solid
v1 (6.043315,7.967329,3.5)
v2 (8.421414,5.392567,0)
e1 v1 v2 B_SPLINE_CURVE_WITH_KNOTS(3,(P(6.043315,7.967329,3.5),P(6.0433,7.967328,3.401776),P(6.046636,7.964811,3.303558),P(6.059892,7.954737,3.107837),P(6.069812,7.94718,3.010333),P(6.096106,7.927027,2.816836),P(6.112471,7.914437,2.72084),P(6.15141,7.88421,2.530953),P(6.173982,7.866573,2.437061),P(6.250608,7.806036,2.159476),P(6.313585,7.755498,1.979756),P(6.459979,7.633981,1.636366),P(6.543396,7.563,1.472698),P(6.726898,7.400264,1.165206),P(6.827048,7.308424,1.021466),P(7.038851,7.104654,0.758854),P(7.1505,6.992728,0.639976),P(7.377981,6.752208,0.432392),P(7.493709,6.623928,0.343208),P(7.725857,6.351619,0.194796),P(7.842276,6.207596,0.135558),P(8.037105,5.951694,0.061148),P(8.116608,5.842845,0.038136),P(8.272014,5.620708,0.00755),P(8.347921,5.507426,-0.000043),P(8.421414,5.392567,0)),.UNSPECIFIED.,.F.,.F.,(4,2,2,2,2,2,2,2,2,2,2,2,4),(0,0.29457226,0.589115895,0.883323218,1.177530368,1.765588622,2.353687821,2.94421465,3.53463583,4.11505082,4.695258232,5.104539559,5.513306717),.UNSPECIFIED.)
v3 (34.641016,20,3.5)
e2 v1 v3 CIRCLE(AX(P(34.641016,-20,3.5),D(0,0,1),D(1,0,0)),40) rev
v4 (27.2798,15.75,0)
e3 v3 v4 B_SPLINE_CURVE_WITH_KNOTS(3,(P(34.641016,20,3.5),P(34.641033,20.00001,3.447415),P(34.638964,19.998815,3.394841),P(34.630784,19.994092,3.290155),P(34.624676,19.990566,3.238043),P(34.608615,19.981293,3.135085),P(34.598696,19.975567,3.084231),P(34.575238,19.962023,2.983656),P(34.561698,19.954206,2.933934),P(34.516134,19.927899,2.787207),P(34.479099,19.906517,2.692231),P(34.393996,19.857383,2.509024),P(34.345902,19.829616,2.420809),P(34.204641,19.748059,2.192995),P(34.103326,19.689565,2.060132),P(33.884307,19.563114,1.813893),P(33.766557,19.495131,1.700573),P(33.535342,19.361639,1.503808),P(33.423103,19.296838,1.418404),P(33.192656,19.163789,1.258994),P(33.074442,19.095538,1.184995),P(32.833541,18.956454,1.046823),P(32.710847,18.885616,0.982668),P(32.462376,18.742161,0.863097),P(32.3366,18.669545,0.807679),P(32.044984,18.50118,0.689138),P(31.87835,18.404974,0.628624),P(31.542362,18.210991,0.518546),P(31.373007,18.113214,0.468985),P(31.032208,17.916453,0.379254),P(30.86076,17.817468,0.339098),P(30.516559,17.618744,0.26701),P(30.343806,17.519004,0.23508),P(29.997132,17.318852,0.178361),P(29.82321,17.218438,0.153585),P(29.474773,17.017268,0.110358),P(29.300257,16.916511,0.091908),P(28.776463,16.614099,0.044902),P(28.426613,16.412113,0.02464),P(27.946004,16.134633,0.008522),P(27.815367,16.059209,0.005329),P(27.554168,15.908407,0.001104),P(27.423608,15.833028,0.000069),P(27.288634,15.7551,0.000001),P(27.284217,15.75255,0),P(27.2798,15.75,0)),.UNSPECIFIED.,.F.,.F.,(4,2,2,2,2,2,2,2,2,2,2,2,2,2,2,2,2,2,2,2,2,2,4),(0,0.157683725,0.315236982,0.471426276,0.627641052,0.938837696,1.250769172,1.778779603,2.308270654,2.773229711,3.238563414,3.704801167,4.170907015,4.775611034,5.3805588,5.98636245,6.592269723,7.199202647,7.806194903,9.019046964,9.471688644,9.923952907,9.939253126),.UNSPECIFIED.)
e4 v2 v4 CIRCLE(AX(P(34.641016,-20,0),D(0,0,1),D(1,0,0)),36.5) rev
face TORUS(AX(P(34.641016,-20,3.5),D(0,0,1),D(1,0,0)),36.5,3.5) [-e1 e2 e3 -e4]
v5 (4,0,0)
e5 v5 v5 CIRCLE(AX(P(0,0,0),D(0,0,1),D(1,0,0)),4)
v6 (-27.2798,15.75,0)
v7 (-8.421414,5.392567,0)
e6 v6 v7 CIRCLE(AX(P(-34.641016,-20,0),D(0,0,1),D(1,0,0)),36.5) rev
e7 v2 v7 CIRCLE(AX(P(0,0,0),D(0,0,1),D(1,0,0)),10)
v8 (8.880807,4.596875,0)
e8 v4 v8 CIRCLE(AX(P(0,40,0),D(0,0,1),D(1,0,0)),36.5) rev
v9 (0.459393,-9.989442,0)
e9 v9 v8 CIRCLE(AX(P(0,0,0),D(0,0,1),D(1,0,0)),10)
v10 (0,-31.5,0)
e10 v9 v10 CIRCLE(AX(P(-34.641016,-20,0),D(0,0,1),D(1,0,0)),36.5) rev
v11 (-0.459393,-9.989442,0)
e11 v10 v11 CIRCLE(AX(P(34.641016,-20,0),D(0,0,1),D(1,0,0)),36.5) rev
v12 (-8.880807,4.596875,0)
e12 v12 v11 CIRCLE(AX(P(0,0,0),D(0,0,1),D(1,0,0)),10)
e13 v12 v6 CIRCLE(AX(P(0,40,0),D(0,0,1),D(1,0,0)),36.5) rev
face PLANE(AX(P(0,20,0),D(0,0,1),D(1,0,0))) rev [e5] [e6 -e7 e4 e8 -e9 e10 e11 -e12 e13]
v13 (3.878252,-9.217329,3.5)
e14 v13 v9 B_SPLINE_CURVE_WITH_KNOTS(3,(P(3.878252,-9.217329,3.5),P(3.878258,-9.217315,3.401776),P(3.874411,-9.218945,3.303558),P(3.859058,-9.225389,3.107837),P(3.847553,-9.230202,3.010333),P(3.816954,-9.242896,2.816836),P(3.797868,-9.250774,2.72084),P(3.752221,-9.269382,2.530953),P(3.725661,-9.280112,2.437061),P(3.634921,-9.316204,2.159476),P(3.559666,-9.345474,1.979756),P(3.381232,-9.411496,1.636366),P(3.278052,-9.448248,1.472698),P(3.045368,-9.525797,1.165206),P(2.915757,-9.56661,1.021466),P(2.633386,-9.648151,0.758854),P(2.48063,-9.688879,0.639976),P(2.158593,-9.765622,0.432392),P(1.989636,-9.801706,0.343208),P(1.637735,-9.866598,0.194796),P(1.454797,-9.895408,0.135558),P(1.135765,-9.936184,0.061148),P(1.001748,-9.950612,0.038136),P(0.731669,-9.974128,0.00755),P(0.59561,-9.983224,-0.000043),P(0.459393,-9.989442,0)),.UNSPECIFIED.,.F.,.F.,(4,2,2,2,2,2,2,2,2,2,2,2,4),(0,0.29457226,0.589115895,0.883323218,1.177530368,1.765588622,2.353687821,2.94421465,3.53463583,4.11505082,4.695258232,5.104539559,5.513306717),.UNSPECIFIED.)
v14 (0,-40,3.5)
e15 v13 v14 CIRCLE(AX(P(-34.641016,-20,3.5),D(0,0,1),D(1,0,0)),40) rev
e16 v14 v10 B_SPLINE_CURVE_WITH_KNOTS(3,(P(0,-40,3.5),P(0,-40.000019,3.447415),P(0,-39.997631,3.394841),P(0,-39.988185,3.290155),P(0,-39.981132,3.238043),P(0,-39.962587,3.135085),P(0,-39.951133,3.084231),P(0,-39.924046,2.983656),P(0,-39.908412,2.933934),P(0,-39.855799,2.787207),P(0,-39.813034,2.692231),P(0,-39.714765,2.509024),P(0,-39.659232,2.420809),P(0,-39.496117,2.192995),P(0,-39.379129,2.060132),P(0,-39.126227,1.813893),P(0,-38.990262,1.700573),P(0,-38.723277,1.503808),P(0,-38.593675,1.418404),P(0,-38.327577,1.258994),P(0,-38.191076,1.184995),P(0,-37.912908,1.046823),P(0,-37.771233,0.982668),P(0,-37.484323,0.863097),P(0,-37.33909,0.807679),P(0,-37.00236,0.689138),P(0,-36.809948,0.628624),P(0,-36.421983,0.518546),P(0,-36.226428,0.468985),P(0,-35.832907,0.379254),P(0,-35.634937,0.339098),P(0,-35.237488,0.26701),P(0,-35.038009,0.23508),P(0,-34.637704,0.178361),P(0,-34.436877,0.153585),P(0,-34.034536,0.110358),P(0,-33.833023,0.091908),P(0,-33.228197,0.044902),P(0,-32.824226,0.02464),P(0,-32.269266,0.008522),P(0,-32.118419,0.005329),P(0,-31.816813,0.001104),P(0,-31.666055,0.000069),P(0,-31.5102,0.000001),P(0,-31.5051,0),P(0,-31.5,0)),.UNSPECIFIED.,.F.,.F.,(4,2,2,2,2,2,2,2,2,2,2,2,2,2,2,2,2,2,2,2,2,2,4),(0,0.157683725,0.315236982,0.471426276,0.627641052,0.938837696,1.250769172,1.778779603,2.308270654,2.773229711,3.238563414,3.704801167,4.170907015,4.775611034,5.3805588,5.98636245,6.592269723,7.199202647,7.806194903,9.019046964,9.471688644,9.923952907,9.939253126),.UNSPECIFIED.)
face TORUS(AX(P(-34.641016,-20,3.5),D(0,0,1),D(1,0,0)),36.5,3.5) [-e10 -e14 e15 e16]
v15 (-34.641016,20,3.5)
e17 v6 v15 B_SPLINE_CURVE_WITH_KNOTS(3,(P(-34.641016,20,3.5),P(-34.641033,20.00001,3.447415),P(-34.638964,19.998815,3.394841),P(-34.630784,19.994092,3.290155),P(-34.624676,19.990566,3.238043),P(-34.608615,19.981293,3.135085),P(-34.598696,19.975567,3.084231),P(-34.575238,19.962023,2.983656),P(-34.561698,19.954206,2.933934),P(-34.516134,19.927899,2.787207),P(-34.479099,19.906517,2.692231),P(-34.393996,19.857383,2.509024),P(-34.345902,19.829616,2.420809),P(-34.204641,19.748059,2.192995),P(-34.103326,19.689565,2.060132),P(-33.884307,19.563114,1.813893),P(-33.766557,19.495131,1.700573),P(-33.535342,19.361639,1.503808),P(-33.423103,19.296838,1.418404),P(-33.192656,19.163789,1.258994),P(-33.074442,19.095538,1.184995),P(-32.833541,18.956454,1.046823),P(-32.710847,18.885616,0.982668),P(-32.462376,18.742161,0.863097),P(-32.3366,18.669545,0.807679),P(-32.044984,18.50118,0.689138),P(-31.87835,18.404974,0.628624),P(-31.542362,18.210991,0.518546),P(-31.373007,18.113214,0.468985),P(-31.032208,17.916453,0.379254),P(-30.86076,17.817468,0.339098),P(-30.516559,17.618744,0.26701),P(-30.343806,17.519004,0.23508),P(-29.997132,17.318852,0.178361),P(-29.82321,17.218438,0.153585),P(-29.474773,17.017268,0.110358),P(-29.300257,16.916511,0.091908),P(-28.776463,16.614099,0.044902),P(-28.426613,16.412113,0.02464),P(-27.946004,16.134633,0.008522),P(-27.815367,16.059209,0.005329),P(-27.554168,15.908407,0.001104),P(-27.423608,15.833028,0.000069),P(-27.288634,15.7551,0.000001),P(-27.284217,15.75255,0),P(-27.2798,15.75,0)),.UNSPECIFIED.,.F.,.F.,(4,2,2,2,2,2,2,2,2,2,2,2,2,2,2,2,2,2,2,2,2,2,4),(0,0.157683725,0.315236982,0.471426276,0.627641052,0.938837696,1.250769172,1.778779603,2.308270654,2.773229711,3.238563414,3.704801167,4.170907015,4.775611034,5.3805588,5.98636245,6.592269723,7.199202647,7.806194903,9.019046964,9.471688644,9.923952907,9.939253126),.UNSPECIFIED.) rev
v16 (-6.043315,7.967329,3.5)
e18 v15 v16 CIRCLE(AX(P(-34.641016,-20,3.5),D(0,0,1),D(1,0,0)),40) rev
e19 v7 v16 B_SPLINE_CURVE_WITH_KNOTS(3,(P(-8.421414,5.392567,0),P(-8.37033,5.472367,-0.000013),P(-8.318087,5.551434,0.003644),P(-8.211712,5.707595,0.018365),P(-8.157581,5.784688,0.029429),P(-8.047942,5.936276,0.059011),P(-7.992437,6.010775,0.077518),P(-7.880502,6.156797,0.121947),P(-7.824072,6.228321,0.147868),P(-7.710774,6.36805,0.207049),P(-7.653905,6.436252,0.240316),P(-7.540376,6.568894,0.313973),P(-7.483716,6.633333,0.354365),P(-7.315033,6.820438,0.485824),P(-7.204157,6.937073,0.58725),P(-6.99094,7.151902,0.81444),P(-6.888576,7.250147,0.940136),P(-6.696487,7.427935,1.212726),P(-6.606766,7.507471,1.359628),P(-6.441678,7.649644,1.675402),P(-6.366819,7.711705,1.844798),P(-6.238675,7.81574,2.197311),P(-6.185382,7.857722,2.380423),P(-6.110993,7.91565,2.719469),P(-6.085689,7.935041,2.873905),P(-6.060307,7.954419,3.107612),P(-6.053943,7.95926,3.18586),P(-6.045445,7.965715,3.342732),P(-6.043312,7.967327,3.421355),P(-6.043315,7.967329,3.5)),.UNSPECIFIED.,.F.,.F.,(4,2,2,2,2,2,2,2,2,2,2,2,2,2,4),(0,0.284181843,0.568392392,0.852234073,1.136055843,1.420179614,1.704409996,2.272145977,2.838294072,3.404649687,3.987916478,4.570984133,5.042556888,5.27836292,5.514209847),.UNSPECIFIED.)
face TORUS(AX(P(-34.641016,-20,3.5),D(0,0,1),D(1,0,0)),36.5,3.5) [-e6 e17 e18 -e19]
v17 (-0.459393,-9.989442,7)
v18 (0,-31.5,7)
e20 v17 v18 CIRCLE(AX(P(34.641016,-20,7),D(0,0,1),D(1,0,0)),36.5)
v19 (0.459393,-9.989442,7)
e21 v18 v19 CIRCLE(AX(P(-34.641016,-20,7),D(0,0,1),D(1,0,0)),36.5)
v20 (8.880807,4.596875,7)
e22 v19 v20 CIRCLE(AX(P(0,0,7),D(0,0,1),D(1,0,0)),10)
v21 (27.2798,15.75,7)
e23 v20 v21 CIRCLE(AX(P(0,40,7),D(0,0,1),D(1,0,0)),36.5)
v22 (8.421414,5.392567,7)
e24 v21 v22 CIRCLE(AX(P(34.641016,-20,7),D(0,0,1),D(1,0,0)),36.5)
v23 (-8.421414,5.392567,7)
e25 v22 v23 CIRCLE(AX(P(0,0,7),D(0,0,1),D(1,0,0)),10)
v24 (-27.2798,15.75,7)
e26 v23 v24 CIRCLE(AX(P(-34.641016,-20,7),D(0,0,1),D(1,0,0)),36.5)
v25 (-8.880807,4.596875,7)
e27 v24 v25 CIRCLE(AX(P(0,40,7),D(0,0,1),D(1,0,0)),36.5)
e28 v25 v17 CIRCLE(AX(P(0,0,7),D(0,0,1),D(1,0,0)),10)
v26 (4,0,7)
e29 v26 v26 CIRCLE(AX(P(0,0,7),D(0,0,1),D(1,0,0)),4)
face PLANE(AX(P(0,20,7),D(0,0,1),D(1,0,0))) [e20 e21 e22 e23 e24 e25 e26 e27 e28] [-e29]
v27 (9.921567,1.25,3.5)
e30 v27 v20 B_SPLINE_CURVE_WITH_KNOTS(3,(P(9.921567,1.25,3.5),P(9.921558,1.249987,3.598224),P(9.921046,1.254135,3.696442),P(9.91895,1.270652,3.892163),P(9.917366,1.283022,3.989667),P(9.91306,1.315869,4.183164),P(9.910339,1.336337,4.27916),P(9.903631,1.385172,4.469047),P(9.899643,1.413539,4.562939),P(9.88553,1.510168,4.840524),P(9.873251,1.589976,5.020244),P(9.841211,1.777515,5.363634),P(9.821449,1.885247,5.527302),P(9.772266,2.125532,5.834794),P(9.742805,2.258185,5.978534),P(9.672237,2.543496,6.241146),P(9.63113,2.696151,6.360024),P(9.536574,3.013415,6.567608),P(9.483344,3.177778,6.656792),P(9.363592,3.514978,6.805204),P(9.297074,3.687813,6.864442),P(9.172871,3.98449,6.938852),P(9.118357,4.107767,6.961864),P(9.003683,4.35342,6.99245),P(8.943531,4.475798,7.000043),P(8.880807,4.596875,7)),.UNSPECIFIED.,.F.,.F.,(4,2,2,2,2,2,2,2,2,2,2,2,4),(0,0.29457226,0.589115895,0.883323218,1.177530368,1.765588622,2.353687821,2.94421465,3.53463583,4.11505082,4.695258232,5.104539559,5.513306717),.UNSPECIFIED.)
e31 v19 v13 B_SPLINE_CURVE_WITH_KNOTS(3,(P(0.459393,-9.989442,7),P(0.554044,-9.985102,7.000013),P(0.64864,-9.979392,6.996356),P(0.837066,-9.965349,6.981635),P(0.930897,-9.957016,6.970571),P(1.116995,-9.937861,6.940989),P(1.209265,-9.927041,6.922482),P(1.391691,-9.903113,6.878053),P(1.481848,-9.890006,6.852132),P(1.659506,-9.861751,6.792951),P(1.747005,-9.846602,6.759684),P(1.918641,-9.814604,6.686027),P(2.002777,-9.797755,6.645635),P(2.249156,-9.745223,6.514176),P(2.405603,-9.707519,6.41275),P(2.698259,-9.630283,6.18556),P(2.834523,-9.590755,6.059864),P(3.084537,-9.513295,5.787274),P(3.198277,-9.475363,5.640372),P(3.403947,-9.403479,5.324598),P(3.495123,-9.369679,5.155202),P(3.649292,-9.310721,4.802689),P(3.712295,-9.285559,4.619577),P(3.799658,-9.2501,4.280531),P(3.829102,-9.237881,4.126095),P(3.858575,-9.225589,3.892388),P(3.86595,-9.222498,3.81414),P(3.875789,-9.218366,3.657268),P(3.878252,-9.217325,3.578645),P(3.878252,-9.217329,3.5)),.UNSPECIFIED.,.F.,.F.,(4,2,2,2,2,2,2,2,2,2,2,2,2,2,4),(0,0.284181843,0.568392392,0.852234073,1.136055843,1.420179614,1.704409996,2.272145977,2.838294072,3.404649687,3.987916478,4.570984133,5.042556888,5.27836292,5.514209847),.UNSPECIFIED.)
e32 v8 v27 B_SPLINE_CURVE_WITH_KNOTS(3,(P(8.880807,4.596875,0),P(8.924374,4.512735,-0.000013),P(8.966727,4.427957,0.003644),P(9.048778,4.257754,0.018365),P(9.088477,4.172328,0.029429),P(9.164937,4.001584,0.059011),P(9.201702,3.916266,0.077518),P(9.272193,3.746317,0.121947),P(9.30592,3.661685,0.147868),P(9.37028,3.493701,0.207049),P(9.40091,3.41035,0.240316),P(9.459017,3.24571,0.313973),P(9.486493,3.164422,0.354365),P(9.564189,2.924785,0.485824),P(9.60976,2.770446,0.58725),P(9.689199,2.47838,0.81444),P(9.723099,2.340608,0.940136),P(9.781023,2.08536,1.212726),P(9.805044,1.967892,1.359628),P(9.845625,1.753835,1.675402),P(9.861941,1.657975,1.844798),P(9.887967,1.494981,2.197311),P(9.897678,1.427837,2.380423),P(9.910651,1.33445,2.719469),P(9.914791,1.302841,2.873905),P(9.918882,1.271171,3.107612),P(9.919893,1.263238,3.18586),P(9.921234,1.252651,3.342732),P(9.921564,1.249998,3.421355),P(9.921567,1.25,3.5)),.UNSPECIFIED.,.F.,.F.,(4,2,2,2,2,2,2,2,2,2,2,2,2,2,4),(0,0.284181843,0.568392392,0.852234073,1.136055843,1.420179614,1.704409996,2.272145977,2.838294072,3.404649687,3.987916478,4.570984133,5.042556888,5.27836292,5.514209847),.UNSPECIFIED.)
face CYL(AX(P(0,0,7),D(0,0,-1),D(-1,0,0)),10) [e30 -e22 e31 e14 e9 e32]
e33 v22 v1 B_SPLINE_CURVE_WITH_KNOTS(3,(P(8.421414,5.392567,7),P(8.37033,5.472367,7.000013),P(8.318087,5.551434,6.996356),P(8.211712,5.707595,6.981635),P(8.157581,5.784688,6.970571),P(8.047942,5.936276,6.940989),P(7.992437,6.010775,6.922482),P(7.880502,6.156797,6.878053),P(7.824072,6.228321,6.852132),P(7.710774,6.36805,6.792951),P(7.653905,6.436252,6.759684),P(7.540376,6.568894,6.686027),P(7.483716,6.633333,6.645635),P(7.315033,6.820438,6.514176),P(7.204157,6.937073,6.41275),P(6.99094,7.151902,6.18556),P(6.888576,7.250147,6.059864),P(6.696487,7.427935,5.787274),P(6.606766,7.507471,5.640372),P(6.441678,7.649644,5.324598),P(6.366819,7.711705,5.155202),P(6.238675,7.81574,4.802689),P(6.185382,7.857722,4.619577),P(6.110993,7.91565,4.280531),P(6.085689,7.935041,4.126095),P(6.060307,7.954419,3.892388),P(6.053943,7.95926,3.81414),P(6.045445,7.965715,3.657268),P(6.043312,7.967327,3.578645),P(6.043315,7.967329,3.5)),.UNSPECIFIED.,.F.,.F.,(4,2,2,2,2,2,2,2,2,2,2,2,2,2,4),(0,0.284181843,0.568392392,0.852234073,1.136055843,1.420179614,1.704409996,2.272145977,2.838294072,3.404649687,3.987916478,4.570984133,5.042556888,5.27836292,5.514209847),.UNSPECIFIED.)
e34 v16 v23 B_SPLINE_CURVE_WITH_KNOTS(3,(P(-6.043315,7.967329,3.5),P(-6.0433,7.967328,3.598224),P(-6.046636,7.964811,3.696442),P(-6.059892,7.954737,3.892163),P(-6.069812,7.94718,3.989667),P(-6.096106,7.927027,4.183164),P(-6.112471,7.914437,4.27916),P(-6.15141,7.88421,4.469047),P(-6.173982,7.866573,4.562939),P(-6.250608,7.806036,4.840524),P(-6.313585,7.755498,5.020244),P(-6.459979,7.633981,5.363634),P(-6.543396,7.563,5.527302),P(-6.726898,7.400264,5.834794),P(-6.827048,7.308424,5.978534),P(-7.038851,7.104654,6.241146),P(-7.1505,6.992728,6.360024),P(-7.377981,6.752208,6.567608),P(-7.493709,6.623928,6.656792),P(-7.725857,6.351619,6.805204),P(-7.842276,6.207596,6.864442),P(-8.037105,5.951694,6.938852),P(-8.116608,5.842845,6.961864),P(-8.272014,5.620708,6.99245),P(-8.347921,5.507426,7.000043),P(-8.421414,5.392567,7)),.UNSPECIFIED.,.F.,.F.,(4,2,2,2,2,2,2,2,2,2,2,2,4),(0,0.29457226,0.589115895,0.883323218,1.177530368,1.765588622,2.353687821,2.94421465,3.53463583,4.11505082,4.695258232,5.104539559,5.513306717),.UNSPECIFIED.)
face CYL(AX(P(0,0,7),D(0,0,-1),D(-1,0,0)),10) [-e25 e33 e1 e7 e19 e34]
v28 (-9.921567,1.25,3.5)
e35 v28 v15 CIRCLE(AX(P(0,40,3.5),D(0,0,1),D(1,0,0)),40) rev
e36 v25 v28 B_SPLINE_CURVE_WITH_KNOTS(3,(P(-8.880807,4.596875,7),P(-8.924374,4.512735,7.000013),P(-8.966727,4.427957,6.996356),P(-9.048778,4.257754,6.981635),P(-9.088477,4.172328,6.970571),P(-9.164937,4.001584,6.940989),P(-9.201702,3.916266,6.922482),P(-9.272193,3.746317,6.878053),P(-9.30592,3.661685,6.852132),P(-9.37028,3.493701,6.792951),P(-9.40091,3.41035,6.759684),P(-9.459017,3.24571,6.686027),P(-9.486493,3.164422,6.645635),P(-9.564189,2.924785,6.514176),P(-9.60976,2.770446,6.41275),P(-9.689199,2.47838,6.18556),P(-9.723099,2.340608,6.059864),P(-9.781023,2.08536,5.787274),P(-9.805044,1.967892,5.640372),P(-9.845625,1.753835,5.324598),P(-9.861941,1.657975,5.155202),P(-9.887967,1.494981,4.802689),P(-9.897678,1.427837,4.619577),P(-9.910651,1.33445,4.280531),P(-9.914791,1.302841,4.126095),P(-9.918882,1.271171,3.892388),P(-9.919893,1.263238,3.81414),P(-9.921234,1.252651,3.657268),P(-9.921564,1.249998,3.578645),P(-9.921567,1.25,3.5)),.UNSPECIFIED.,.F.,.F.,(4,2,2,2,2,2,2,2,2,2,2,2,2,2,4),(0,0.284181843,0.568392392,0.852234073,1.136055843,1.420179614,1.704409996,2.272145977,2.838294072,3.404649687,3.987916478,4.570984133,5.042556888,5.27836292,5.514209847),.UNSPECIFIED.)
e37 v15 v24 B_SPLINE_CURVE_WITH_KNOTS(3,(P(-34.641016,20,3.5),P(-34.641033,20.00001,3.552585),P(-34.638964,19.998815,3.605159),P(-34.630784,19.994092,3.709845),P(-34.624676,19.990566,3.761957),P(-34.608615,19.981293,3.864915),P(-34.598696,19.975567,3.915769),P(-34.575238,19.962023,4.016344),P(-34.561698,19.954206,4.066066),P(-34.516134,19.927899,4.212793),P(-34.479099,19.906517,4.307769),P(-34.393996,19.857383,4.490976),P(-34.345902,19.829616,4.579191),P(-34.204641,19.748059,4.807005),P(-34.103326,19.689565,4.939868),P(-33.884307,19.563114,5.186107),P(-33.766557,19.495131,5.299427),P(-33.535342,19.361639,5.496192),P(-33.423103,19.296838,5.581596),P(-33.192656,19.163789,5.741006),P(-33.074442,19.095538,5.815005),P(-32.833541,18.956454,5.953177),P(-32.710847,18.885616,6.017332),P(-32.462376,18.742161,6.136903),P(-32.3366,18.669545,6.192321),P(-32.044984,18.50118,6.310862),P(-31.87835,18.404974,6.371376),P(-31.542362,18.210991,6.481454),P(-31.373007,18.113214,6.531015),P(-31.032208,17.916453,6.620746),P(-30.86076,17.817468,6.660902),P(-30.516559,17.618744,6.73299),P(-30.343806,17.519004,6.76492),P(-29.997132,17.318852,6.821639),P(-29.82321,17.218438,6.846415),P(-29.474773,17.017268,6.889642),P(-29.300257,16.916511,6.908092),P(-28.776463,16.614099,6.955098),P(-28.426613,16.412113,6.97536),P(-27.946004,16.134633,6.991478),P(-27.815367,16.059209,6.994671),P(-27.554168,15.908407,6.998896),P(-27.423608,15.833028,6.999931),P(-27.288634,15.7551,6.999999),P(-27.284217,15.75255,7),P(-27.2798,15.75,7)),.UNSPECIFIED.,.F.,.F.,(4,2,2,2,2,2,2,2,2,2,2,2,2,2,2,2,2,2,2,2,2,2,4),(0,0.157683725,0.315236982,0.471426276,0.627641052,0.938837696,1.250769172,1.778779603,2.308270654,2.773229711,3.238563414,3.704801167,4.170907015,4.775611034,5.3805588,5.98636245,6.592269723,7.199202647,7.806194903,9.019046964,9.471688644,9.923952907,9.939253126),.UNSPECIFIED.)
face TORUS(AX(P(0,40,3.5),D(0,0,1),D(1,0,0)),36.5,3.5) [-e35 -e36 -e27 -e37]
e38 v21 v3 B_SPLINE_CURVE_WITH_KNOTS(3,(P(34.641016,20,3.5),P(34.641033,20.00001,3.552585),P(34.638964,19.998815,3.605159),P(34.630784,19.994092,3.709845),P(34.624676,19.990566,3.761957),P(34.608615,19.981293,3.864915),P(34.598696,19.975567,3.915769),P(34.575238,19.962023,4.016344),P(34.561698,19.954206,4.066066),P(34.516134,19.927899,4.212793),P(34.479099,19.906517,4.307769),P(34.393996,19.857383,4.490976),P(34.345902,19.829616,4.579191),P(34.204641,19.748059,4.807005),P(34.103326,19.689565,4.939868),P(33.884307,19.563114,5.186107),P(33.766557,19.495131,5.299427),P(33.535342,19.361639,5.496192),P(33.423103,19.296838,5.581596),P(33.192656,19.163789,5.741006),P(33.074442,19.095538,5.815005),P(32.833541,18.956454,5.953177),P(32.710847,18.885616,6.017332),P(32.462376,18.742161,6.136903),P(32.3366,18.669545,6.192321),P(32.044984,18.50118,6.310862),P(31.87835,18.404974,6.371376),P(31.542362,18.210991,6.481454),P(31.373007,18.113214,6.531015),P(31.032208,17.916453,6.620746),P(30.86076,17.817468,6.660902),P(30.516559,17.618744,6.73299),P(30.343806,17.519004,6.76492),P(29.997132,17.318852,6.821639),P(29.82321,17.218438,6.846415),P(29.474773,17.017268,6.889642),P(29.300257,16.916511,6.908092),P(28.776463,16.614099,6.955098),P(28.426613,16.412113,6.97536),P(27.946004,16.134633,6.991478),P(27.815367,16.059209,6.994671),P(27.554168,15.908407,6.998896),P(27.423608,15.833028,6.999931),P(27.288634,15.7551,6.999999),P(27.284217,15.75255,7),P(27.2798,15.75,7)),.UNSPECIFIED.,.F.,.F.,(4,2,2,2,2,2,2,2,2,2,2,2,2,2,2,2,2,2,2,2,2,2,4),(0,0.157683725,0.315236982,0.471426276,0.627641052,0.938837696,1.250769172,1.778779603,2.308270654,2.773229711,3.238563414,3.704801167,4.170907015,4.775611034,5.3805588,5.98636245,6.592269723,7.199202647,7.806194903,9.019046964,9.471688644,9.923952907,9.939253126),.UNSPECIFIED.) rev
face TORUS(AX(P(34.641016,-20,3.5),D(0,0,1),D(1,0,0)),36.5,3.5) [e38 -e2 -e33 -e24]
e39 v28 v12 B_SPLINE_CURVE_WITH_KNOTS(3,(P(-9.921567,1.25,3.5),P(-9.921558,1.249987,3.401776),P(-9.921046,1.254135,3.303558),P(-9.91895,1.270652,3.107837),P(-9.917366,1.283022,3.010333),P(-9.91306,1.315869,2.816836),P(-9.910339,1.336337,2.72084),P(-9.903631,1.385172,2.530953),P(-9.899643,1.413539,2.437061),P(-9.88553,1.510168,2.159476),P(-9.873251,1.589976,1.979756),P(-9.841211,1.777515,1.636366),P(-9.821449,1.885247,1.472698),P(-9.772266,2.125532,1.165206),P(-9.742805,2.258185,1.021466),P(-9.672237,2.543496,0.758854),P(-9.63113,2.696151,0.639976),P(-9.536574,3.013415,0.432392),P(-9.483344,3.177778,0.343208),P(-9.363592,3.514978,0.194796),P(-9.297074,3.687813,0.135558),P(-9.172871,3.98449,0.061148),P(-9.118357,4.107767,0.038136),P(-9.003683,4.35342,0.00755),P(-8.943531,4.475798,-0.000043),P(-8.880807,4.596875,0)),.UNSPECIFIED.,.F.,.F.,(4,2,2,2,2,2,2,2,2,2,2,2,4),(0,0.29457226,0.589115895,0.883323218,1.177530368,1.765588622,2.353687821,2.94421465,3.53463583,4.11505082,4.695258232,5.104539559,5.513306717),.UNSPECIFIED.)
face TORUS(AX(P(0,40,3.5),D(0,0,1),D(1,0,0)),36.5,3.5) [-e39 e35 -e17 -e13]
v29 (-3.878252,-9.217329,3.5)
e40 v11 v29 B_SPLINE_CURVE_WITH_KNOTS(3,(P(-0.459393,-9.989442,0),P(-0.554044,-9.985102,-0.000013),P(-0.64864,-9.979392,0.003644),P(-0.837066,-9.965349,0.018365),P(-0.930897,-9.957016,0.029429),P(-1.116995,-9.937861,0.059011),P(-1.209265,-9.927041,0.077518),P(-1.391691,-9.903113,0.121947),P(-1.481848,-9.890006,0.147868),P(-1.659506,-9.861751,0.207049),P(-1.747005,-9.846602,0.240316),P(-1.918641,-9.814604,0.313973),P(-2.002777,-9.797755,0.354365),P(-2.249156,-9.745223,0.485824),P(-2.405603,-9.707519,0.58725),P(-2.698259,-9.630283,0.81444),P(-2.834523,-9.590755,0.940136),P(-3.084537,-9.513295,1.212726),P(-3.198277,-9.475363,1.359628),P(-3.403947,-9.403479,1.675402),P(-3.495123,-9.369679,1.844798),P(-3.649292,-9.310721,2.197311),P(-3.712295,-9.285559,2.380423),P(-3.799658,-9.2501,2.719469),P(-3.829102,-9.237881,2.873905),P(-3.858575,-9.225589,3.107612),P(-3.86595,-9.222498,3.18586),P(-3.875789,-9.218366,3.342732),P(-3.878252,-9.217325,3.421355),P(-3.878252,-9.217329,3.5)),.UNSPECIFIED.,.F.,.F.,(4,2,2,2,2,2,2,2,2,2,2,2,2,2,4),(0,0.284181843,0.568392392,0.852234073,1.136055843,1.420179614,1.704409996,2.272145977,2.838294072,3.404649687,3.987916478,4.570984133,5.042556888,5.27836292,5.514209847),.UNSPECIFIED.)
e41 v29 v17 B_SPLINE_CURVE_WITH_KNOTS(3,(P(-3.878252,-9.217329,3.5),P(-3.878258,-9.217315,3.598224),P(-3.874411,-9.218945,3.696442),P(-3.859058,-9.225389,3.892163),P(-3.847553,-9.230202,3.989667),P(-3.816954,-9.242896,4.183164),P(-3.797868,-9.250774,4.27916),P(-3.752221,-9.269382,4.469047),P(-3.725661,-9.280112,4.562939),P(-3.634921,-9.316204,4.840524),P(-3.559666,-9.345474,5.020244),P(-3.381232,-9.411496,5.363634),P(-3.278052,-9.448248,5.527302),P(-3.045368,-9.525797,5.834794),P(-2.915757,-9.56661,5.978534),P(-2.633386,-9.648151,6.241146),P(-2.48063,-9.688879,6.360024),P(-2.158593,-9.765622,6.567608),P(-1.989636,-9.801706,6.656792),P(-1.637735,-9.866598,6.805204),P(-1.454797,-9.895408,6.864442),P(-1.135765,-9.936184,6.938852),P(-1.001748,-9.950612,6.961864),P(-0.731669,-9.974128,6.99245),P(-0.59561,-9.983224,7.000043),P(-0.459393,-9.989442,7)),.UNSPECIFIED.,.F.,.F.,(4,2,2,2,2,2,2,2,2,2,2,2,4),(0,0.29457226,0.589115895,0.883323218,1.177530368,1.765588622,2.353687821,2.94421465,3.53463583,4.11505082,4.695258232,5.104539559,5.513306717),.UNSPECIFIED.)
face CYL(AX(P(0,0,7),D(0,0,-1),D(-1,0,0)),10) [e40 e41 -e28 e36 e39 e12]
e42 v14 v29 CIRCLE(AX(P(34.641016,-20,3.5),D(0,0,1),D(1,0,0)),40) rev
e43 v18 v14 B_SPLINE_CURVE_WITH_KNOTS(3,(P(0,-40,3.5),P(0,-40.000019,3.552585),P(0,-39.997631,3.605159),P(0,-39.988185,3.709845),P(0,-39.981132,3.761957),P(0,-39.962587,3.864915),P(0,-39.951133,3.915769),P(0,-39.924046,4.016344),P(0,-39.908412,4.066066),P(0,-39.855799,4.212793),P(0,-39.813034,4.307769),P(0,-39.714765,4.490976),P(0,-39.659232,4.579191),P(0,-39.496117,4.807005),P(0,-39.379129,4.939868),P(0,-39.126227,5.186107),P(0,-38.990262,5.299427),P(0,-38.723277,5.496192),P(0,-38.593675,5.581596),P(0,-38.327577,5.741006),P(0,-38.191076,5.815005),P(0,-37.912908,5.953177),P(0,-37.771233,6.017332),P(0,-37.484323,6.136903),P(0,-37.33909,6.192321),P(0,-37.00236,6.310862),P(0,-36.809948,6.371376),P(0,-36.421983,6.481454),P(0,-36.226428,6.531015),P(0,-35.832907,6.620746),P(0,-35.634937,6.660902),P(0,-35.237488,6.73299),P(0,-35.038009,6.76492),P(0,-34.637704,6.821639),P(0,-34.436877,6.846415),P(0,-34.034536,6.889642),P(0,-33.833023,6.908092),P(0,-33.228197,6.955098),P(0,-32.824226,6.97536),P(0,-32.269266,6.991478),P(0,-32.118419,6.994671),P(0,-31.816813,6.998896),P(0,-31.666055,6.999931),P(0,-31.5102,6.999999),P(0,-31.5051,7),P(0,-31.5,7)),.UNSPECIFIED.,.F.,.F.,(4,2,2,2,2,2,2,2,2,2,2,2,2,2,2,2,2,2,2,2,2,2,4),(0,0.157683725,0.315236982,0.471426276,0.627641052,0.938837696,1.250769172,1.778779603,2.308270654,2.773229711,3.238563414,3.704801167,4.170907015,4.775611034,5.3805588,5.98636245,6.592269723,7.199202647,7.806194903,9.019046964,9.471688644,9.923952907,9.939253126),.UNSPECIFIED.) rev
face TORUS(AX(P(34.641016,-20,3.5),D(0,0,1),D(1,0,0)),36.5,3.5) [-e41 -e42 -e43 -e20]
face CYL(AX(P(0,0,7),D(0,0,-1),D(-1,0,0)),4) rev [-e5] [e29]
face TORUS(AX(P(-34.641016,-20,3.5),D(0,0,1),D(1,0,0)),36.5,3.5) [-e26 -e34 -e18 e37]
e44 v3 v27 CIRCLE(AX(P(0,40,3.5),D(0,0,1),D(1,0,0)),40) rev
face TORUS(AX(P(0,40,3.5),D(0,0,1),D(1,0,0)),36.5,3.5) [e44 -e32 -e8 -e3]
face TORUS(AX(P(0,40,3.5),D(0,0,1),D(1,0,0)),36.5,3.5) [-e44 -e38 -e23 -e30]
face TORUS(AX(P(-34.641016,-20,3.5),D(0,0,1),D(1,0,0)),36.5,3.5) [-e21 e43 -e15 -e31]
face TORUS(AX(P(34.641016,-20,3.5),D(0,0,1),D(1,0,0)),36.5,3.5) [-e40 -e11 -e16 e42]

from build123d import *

# Parameters (mm, degrees)
SKETCH1_R           = 4
BOSS_EXTRUDE1_DEPTH = 7
FILLET2_R           = 3.5


with BuildPart() as part:
    # Sketch1 → Boss-Extrude1 (new body)
    with BuildSketch(Plane.XY):
        with BuildLine():
            ThreePointArc((-9.921567416, 1.25), (-8.660254038, -5), (-3.878251954, -9.217329428))
            ThreePointArc((-3.878251954, -9.217329428), (-5.045253515, -25), (0, -40))
            ThreePointArc((0, -40), (5.045253515, -25), (3.878251954, -9.217329428))
            ThreePointArc((3.878251954, -9.217329428), (8.660254038, -5), (9.921567416, 1.25))
            ThreePointArc((9.921567416, 1.25), (24.173261852, 8.130682288), (34.641016151, 20))
            ThreePointArc((34.641016151, 20), (19.128008337, 16.869317712), (6.043315463, 7.967329428))
            ThreePointArc((6.043315463, 7.967329428), (0, 10), (-6.043315463, 7.967329428))
            ThreePointArc((-6.043315463, 7.967329428), (-19.128008337, 16.869317712), (-34.641016151, 20))
            ThreePointArc((-34.641016151, 20), (-24.173261852, 8.130682288), (-9.921567416, 1.25))
        make_face()
        Circle(SKETCH1_R, mode=Mode.SUBTRACT)
    extrude(amount=BOSS_EXTRUDE1_DEPTH)

    # Fillet2
    fillet2_edges = [part.edges().sort_by_distance(p)[0] for p in [
        (-19.128008337, 16.869317712, 0),
        (-24.173261852, 8.130682288, 0),
        (19.128008337, 16.869317712, 0),
        (24.173261852, 8.130682288, 0),
        (5.045253515, -25, 0),
        (-5.045253515, -25, 0),
        (-5.045253515, -25, 7),
        (5.045253515, -25, 7),
        (24.173261852, 8.130682288, 7),
        (19.128008337, 16.869317712, 7),
        (-19.128008337, 16.869317712, 7),
        (-24.173261852, 8.130682288, 7),
    ]]
    fillet(fillet2_edges, radius=FILLET2_R - 0.0001)  # a hair under: the kernel refuses the full size


solid = part.part
